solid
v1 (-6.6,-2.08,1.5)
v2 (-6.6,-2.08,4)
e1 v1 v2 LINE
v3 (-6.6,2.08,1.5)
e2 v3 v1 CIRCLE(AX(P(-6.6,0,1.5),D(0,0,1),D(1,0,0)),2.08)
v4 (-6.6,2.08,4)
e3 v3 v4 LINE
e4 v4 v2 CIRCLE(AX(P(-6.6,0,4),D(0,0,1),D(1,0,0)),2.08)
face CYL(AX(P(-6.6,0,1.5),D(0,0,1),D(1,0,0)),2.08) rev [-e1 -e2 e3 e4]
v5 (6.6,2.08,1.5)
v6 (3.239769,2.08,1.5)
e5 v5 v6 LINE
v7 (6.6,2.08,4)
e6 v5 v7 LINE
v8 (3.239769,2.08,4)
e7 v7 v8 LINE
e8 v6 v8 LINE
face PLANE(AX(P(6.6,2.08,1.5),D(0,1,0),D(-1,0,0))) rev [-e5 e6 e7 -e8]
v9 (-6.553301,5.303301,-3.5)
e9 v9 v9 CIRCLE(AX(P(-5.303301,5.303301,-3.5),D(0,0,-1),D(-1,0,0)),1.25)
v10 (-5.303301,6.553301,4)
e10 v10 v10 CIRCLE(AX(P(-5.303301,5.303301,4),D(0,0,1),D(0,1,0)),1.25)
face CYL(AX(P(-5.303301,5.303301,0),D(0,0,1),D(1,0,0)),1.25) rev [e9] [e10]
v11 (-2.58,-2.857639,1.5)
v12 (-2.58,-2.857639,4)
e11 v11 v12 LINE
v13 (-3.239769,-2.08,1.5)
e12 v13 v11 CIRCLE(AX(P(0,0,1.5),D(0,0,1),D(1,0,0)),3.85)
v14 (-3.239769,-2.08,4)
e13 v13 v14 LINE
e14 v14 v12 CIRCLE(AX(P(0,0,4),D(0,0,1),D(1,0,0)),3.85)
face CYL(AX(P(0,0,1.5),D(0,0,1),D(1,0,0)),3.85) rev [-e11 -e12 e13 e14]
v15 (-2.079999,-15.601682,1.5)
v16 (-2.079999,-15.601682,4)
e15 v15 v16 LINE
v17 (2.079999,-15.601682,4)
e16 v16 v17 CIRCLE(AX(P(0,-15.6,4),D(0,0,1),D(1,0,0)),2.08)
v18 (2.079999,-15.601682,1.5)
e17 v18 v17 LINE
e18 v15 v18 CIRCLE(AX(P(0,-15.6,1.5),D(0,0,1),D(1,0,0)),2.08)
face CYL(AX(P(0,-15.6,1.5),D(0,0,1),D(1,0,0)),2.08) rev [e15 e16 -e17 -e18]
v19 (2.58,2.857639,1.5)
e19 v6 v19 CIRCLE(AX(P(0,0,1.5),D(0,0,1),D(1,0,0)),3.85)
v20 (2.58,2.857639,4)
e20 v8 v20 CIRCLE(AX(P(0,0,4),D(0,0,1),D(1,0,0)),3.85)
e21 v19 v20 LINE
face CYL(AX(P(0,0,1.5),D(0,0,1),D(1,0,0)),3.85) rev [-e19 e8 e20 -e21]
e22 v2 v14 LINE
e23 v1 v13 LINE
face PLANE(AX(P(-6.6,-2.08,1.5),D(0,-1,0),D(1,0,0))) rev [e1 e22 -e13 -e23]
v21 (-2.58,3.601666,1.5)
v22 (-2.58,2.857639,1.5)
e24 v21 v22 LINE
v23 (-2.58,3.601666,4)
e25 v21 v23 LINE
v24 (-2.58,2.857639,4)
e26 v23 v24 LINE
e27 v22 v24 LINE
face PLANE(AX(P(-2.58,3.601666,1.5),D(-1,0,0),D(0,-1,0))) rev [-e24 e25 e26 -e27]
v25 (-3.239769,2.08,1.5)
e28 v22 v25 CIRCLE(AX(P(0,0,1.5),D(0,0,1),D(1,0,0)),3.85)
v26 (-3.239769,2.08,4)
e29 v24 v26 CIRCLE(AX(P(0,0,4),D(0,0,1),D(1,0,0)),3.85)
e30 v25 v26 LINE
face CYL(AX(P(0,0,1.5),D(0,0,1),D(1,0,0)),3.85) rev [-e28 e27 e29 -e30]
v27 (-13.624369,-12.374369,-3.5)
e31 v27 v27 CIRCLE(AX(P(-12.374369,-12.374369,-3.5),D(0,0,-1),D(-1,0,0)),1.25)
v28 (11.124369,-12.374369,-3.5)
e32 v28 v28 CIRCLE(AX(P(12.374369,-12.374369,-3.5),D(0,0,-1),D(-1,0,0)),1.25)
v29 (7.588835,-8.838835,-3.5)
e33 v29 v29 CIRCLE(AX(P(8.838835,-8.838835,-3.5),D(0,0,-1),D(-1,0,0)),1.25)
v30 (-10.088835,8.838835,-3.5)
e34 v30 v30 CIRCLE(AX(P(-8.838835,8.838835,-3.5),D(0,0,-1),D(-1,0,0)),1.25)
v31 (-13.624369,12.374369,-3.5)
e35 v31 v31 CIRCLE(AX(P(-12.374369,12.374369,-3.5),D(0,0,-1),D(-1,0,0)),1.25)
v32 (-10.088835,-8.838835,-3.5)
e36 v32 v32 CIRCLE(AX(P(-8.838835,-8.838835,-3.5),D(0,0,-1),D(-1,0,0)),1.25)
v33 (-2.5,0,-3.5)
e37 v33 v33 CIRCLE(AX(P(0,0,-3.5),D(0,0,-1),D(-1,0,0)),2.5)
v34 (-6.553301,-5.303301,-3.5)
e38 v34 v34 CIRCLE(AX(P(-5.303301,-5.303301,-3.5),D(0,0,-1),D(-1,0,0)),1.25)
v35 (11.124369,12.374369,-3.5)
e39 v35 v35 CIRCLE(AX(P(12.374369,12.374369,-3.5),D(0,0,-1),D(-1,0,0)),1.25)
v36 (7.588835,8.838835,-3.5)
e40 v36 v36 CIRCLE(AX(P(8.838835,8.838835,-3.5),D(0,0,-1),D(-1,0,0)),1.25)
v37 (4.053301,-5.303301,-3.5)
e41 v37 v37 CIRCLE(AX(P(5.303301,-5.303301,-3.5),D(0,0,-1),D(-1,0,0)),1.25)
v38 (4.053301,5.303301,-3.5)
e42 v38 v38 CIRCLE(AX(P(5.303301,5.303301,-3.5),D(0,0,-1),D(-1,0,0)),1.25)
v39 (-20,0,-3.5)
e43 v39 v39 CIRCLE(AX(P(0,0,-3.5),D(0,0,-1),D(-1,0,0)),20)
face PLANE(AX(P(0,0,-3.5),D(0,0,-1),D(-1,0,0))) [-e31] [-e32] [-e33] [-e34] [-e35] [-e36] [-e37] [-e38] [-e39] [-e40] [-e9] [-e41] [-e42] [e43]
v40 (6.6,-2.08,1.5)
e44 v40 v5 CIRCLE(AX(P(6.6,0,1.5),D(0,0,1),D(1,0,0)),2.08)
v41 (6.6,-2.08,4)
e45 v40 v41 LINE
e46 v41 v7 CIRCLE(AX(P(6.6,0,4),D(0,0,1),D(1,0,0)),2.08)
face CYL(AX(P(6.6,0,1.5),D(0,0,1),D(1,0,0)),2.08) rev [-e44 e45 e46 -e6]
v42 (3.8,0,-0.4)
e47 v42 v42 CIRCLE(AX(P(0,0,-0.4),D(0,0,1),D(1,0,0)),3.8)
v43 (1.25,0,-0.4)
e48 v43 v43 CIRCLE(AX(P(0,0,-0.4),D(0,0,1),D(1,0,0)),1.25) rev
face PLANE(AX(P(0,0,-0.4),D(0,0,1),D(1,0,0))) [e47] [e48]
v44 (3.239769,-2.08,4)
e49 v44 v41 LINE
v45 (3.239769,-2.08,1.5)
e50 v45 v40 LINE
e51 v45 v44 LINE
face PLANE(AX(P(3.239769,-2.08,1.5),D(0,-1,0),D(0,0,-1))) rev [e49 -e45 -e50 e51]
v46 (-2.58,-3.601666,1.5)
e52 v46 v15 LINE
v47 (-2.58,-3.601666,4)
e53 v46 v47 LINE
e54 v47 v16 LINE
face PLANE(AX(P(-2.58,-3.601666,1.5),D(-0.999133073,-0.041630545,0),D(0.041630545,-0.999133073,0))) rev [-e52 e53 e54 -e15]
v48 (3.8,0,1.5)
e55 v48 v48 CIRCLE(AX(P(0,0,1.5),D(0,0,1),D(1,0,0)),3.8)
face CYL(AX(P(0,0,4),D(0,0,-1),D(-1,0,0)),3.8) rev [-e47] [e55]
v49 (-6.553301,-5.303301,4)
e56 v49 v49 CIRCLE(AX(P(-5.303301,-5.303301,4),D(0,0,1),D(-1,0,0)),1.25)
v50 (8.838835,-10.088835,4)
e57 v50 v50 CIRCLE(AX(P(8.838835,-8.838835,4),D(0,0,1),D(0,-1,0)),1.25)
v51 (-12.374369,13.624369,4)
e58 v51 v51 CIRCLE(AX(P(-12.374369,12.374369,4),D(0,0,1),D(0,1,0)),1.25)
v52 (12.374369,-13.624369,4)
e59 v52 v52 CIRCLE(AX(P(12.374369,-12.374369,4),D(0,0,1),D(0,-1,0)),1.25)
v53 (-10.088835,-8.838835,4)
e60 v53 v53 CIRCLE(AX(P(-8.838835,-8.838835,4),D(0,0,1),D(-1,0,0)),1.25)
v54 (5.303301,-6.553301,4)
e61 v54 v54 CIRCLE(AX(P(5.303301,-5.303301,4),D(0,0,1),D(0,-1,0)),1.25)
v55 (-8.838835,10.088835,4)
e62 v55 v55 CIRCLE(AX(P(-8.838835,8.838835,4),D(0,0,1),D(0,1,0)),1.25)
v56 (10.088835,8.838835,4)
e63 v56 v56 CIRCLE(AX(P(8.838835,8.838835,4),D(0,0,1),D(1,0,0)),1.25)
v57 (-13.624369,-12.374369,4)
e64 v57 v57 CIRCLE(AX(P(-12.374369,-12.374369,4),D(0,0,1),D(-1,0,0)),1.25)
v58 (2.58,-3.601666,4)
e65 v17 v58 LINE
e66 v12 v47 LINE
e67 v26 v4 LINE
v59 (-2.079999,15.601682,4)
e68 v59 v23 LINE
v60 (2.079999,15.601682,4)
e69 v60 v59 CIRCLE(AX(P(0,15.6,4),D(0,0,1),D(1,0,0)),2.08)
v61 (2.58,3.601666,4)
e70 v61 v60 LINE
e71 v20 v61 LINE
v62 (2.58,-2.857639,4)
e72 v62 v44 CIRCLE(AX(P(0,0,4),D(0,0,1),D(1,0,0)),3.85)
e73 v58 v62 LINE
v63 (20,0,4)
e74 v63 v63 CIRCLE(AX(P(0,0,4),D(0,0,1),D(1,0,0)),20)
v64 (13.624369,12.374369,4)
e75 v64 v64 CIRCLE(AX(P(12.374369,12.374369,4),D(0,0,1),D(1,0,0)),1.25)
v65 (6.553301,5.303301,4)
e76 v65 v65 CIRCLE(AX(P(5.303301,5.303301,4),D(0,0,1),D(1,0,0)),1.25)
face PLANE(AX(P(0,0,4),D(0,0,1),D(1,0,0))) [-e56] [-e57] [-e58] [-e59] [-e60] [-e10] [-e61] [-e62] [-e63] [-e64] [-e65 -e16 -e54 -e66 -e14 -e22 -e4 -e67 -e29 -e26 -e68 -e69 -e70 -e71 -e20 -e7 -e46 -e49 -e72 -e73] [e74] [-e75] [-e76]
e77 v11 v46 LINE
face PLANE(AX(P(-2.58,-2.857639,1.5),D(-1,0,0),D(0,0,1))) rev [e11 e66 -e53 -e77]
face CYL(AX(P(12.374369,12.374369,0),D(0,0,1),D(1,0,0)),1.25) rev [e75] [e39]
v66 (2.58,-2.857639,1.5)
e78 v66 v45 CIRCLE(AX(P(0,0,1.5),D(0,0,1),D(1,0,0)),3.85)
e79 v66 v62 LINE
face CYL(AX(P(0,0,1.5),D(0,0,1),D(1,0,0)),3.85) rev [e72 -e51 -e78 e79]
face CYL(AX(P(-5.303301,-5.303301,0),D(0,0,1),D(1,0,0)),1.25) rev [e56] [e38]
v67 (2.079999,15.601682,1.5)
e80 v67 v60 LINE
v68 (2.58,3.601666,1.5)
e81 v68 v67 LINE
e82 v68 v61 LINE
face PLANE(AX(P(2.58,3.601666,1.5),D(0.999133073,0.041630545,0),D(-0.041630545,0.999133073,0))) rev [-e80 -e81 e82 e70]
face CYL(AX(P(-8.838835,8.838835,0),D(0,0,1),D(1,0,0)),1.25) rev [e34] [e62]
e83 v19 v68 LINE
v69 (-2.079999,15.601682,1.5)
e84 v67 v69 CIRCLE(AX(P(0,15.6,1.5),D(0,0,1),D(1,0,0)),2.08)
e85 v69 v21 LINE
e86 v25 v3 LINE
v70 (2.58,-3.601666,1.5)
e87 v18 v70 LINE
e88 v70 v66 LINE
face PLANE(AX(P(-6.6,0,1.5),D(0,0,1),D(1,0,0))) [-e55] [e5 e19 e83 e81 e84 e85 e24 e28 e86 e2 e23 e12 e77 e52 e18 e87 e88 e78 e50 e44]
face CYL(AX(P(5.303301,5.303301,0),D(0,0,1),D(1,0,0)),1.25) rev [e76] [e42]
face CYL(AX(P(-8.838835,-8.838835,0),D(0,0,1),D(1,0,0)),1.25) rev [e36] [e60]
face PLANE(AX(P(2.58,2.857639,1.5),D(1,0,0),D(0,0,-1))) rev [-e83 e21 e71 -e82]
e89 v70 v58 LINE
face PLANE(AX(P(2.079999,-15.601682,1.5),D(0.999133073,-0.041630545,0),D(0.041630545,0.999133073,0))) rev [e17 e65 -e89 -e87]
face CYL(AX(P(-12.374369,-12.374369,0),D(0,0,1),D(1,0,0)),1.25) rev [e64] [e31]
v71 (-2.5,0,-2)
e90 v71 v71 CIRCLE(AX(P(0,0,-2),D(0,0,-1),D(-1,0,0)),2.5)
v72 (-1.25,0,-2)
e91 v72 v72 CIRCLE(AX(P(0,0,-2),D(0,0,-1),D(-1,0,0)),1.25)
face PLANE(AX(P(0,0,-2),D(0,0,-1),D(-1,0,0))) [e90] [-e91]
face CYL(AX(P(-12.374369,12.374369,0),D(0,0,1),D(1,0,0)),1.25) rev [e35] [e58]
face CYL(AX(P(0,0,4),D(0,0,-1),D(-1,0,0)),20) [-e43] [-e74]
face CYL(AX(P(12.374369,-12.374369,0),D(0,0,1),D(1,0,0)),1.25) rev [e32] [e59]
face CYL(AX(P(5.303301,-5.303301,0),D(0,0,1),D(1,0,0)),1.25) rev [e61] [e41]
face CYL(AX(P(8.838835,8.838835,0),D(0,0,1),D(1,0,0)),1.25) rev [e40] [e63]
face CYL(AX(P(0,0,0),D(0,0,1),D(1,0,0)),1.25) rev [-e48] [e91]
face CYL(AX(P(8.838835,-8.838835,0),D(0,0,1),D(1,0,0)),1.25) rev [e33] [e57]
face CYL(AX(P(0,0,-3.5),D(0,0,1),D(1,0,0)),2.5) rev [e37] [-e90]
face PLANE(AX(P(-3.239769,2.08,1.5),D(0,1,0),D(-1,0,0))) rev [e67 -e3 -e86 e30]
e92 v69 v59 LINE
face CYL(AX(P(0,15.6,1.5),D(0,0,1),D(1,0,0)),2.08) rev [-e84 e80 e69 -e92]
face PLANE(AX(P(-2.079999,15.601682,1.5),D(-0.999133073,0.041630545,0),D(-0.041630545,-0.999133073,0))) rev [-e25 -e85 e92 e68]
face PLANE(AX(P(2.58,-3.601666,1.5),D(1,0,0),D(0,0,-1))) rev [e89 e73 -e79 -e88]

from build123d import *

# Parameters (mm, degrees)
SKETCH1_R               = 20
BOSS_EXTRUDE1_DEPTH     = 4
SKETCH2_R               = 1.25
CUT_EXTRUDE1_DEPTH      = 29.565713714
CAVITY1_START           = 2.8
CAVITY1_OUTLINE_R       = 0.675
CAVITY1_OUTLINE_R_2     = 0.6
CAVITY1_OUTLINE_R_3     = 2.5
CAVITY1_DEPTH           = 1.2
CAVITY1_START_2         = 3.4
CAVITY1_2_OUTLINE_R     = 2.5
CAVITY1_2_OUTLINE_R_2   = 1.25
CAVITY1_2_DEPTH         = 0.6
CUT_EXTRUDE2_START      = -2
CUT_EXTRUDE2_DEPTH      = 2
CUT_EXTRUDE3_START      = -1.2
CUT_EXTRUDE3_DEPTH      = 1.2
CUT_EXTRUDE4_DEPTH      = 1.2
SKETCH6_R               = 1.25
CUT_EXTRUDE5_DEPTH      = 29.565713714
CIRPATTERN1_COUNT       = 4
CUT_EXTRUDE6_DEPTH      = 29.422526278
CUT_EXTRUDE6_DEPTH_BACK = 2.4
SKETCH7_R               = 3.8
SKETCH8_R               = 20
SKETCH8_R_2             = 2.5
SKETCH8_R_3             = 1.25
BOSS_EXTRUDE2_DEPTH     = 3.5
CUT_EXTRUDE7_DEPTH      = 2.5
SKETCH10_R              = 2.5
SKETCH10_R_2            = 1.25
BOSS_EXTRUDE4_DEPTH     = 0.8
SKETCH11_R              = 2.5
SKETCH11_R_2            = 1.25
BOSS_EXTRUDE5_DEPTH     = 1.2
SKETCH12_R              = 3.8
CUT_EXTRUDE8_DEPTH      = 0.8


# Read off the part's stored shape, not the designer's step: Cavity1
with BuildPart() as part:
    # Sketch1 → Boss-Extrude1 (new body)
    with BuildSketch(Plane.XY):
        Circle(SKETCH1_R)
    extrude(amount=BOSS_EXTRUDE1_DEPTH)

    # Sketch2 → Cut-Extrude1 (cut, through all)
    with BuildSketch(Plane.XY.offset(4)):
        Circle(SKETCH2_R)
    extrude(amount=-CUT_EXTRUDE1_DEPTH, mode=Mode.SUBTRACT)

    # Cavity1 outline → Cavity1 (cut)
    with BuildSketch(Plane.XY.offset(CAVITY1_START)):
        with BuildLine():
            ThreePointArc((2.993325909, 2), (2.762479071, 2.308399745), (2.5, 2.590366769))
            Line((2.5, 2.590366769), (2.5, 3.6))
            Line((2.5, 3.6), (2, 15.6))
            ThreePointArc((2, 15.6), (0, 17.6), (-2, 15.6))
            Line((-2, 15.6), (-2.5, 3.6))
            Line((-2.5, 3.6), (-2.5, 2.590366769))
            ThreePointArc((-2.5, 2.590366769), (-2.762479071, 2.308399745), (-2.993325909, 2))
            Line((-2.993325909, 2), (-6.6, 2))
            ThreePointArc((-6.6, 2), (-8.6, 0), (-6.6, -2))
            Line((-6.6, -2), (-2.993325909, -2))
            ThreePointArc((-2.993325909, -2), (-2.762479071, -2.308399745), (-2.5, -2.590366769))
            Line((-2.5, -2.590366769), (-2.5, -3.6))
            Line((-2.5, -3.6), (-2, -15.6))
            ThreePointArc((-2, -15.6), (0, -17.6), (2, -15.6))
            Line((2, -15.6), (2.5, -3.6))
            Line((2.5, -3.6), (2.5, -2.590366769))
            ThreePointArc((2.5, -2.590366769), (2.762479071, -2.308399745), (2.993325909, -2))
            Line((2.993325909, -2), (6.6, -2))
            ThreePointArc((6.6, -2), (8.6, 0), (6.6, 2))
            Line((6.6, 2), (2.993325909, 2))
        make_face()
        with Locations((0, -15.6)):
            Circle(CAVITY1_OUTLINE_R, mode=Mode.SUBTRACT)
        with Locations((0, -13.4)):
            Circle(CAVITY1_OUTLINE_R, mode=Mode.SUBTRACT)
        with Locations((0, -11.2)):
            Circle(CAVITY1_OUTLINE_R, mode=Mode.SUBTRACT)
        with Locations((0, -9)):
            Circle(CAVITY1_OUTLINE_R, mode=Mode.SUBTRACT)
        with Locations((0, -6.8)):
            Circle(CAVITY1_OUTLINE_R, mode=Mode.SUBTRACT)
        with Locations((0, -4.6)):
            Circle(CAVITY1_OUTLINE_R, mode=Mode.SUBTRACT)
        with Locations((-6.6, 0)):
            Circle(CAVITY1_OUTLINE_R_2, mode=Mode.SUBTRACT)
        with Locations((-4.6, 0)):
            Circle(CAVITY1_OUTLINE_R_2, mode=Mode.SUBTRACT)
        Circle(CAVITY1_OUTLINE_R_3, mode=Mode.SUBTRACT)
        with Locations((0, 4.6)):
            Circle(CAVITY1_OUTLINE_R, mode=Mode.SUBTRACT)
        with Locations((0, 6.8)):
            Circle(CAVITY1_OUTLINE_R, mode=Mode.SUBTRACT)
        with Locations((4.6, 0)):
            Circle(CAVITY1_OUTLINE_R_2, mode=Mode.SUBTRACT)
        with Locations((6.6, 0)):
            Circle(CAVITY1_OUTLINE_R_2, mode=Mode.SUBTRACT)
        with Locations((0, 9)):
            Circle(CAVITY1_OUTLINE_R, mode=Mode.SUBTRACT)
        with Locations((0, 11.2)):
            Circle(CAVITY1_OUTLINE_R, mode=Mode.SUBTRACT)
        with Locations((0, 13.4)):
            Circle(CAVITY1_OUTLINE_R, mode=Mode.SUBTRACT)
        with Locations((0, 15.6)):
            Circle(CAVITY1_OUTLINE_R, mode=Mode.SUBTRACT)
    extrude(amount=CAVITY1_DEPTH, mode=Mode.SUBTRACT)

    # Cavity1 2 outline → Cavity1 2 (cut)
    with BuildSketch(Plane.XY.offset(CAVITY1_START_2)):
        Circle(CAVITY1_2_OUTLINE_R)
        Circle(CAVITY1_2_OUTLINE_R_2, mode=Mode.SUBTRACT)
    extrude(amount=CAVITY1_2_DEPTH, mode=Mode.SUBTRACT)

    # Sketch3 → Cut-Extrude2 (cut)
    with BuildSketch(Plane.XY.offset(3.4).offset(CUT_EXTRUDE2_START)):
        with BuildLine():
            ThreePointArc((-2.5, 0), (0, -2.5), (2.5, 0))
            ThreePointArc((2.5, 0), (0, 2.5), (-2.5, 0))
        make_face()
    extrude(amount=CUT_EXTRUDE2_DEPTH, mode=Mode.SUBTRACT)

    # Sketch4 → Cut-Extrude3 (cut)
    with BuildSketch(Plane.XY.offset(4).offset(CUT_EXTRUDE3_START)):
        with BuildLine():
            Line((-6.6, -2), (-2.993325909, -2))
            ThreePointArc((-2.993325909, -2), (-2.762479071, -2.308399745), (-2.5, -2.590366769))
            Line((-2.5, -2.590366769), (-2.5, -3.6))
            Line((-2.5, -3.6), (-2, -15.6))
            ThreePointArc((-2, -15.6), (0, -17.6), (2, -15.6))
            Line((2, -15.6), (2.5, -3.6))
            Line((2.5, -3.6), (2.5, -2.590366769))
            ThreePointArc((2.5, -2.590366769), (2.762479071, -2.308399745), (2.993325909, -2))
            Line((2.993325909, -2), (6.6, -2))
            ThreePointArc((6.6, -2), (8.6, 0), (6.6, 2))
            Line((6.6, 2), (2.993325909, 2))
            ThreePointArc((2.993325909, 2), (2.762479071, 2.308399745), (2.5, 2.590366769))
            Line((2.5, 2.590366769), (2.5, 3.6))
            Line((2.5, 3.6), (2, 15.6))
            ThreePointArc((2, 15.6), (0, 17.6), (-2, 15.6))
            Line((-2, 15.6), (-2.5, 3.6))
            Line((-2.5, 3.6), (-2.5, 2.590366769))
            ThreePointArc((-2.5, 2.590366769), (-2.762479071, 2.308399745), (-2.993325909, 2))
            Line((-2.993325909, 2), (-6.6, 2))
            ThreePointArc((-6.6, 2), (-8.6, 0), (-6.6, -2))
        make_face()
    extrude(amount=CUT_EXTRUDE3_DEPTH, mode=Mode.SUBTRACT)

    # Sketch5 → Cut-Extrude4 (cut)
    with BuildSketch(Plane.XY.offset(4)):
        with BuildLine():
            Line((-6.6, -2.03), (-3.00931886, -2.03))
            ThreePointArc((-3.00931886, -2.03), (-2.784441978, -2.328901645), (-2.53, -2.603075105))
            Line((-2.53, -2.603075105), (-2.53, -3.600624729))
            Line((-2.53, -3.600624729), (-2.029999903, -15.600627053))
            ThreePointArc((-2.029999903, -15.600627053), (0, -17.63), (2.029999903, -15.600627053))
            Line((2.029999903, -15.600627053), (2.53, -3.600624729))
            Line((2.53, -3.600624729), (2.53, -2.603075105))
            ThreePointArc((2.53, -2.603075105), (2.784441978, -2.328901645), (3.00931886, -2.03))
            Line((3.00931886, -2.03), (6.6, -2.03))
            ThreePointArc((6.6, -2.03), (8.63, 0), (6.6, 2.03))
            Line((6.6, 2.03), (3.00931886, 2.03))
            ThreePointArc((3.00931886, 2.03), (2.784441978, 2.328901645), (2.53, 2.603075105))
            Line((2.53, 2.603075105), (2.53, 3.600624729))
            Line((2.53, 3.600624729), (2.029999903, 15.600627053))
            ThreePointArc((2.029999903, 15.600627053), (0, 17.63), (-2.029999903, 15.600627053))
            Line((-2.029999903, 15.600627053), (-2.53, 3.600624729))
            Line((-2.53, 3.600624729), (-2.53, 2.603075105))
            ThreePointArc((-2.53, 2.603075105), (-2.784441978, 2.328901645), (-3.00931886, 2.03))
            Line((-3.00931886, 2.03), (-6.6, 2.03))
            ThreePointArc((-6.6, 2.03), (-8.63, 0), (-6.6, -2.03))
        make_face()
    extrude(amount=-CUT_EXTRUDE4_DEPTH, mode=Mode.SUBTRACT)

    # Sketch6 → Cut-Extrude5 (cut, through all)
    with BuildSketch(Plane.XY.offset(4)):
        with Locations((5.303300859, 5.303300859)):
            Circle(SKETCH6_R)
        with Locations((8.838834765, 8.838834765)):
            Circle(SKETCH6_R)
        with Locations((12.374368671, 12.374368671)):
            Circle(SKETCH6_R)
    cut_extrude5 = extrude(amount=-CUT_EXTRUDE5_DEPTH, mode=Mode.SUBTRACT)

    # CirPattern1: Cut-Extrude5 ×4 about axis
    cirpattern1_axis = Axis((0, 0, 0), (0, 0, 1))
    for i in range(1, CIRPATTERN1_COUNT):
        add(cut_extrude5.rotate(cirpattern1_axis, i * 360 / CIRPATTERN1_COUNT), mode=Mode.SUBTRACT)

    # Sketch7 → Cut-Extrude6 (cut, two sides: drawn at the far end of the back side and taken through both)
    with BuildSketch(Plane.XY.offset(2.8).offset(-CUT_EXTRUDE6_DEPTH_BACK)):
        with Locations(Location((0, 0, 0), (0, 0, 147.709612918))):
            Circle(SKETCH7_R)
    extrude(amount=CUT_EXTRUDE6_DEPTH + CUT_EXTRUDE6_DEPTH_BACK, mode=Mode.SUBTRACT)

    # Sketch8 → Boss-Extrude2 (add)
    with BuildSketch(Plane(origin=(0, 0, 0), x_dir=(-1, 0, 0), z_dir=(0, 0, -1))):
        Circle(SKETCH8_R)
        Circle(SKETCH8_R_2, mode=Mode.SUBTRACT)
        with Locations(Location((12.374368671, 12.374368671, 0), (0, 0, 90))):
            Circle(SKETCH8_R_3, mode=Mode.SUBTRACT)
        with Locations(Location((-12.374368671, 12.374368671, 0), (0, 0, 180))):
            Circle(SKETCH8_R_3, mode=Mode.SUBTRACT)
        with Locations(Location((-8.838834765, 8.838834765, 0), (0, 0, 180))):
            Circle(SKETCH8_R_3, mode=Mode.SUBTRACT)
        with Locations(Location((-5.303300859, 5.303300859, 0), (0, 0, 180))):
            Circle(SKETCH8_R_3, mode=Mode.SUBTRACT)
        with Locations((12.374368671, -12.374368671)):
            Circle(SKETCH8_R_3, mode=Mode.SUBTRACT)
        with Locations((8.838834765, -8.838834765)):
            Circle(SKETCH8_R_3, mode=Mode.SUBTRACT)
        with Locations((5.303300859, -5.303300859)):
            Circle(SKETCH8_R_3, mode=Mode.SUBTRACT)
        with Locations(Location((-12.374368671, -12.374368671, 0), (0, 0, 270))):
            Circle(SKETCH8_R_3, mode=Mode.SUBTRACT)
        with Locations(Location((-8.838834765, -8.838834765, 0), (0, 0, 270))):
            Circle(SKETCH8_R_3, mode=Mode.SUBTRACT)
        with Locations(Location((-5.303300859, -5.303300859, 0), (0, 0, 270))):
            Circle(SKETCH8_R_3, mode=Mode.SUBTRACT)
        with Locations(Location((5.303300859, 5.303300859, 0), (0, 0, 90))):
            Circle(SKETCH8_R_3, mode=Mode.SUBTRACT)
        with Locations(Location((8.838834765, 8.838834765, 0), (0, 0, 90))):
            Circle(SKETCH8_R_3, mode=Mode.SUBTRACT)
    extrude(amount=BOSS_EXTRUDE2_DEPTH)

    # Sketch9 → Cut-Extrude7 (cut)
    with BuildSketch(Plane.XY.offset(4)):
        with BuildLine():
            Line((2.58, 3.601665944), (2.07999932, 15.601682271))
            ThreePointArc((2.07999932, 15.601682271), (0, 17.68), (-2.07999932, 15.601682271))
            Line((-2.07999932, 15.601682271), (-2.58, 3.601665944))
            Line((-2.58, 3.601665944), (-2.58, 2.857638886))
            ThreePointArc((-2.58, 2.857638886), (-2.935746402, 2.490761543), (-3.23976851, 2.08))
            Line((-3.23976851, 2.08), (-6.6, 2.08))
            ThreePointArc((-6.6, 2.08), (-8.68, 0), (-6.6, -2.08))
            Line((-6.6, -2.08), (-3.23976851, -2.08))
            ThreePointArc((-3.23976851, -2.08), (-2.935746402, -2.490761543), (-2.58, -2.857638886))
            Line((-2.58, -2.857638886), (-2.58, -3.601665944))
            Line((-2.58, -3.601665944), (-2.07999932, -15.601682271))
            ThreePointArc((-2.07999932, -15.601682271), (0, -17.68), (2.07999932, -15.601682271))
            Line((2.07999932, -15.601682271), (2.58, -3.601665944))
            Line((2.58, -3.601665944), (2.58, -2.857638886))
            ThreePointArc((2.58, -2.857638886), (2.935746402, -2.490761543), (3.23976851, -2.08))
            Line((3.23976851, -2.08), (6.6, -2.08))
            ThreePointArc((6.6, -2.08), (8.68, 0), (6.6, 2.08))
            Line((6.6, 2.08), (3.23976851, 2.08))
            ThreePointArc((3.23976851, 2.08), (2.935746402, 2.490761543), (2.58, 2.857638886))
            Line((2.58, 2.857638886), (2.58, 3.601665944))
        make_face()
    extrude(amount=-CUT_EXTRUDE7_DEPTH, mode=Mode.SUBTRACT)

    # Sketch10 → Boss-Extrude4 (add)
    with BuildSketch(Plane(origin=(0, 0, 0), x_dir=(-1, 0, 0), z_dir=(0, 0, -1))):
        Circle(SKETCH10_R)
        with Locations(Location((0, 0, 0), (0, 0, 180))):
            Circle(SKETCH10_R_2, mode=Mode.SUBTRACT)
    extrude(amount=BOSS_EXTRUDE4_DEPTH)

    # Sketch11 → Boss-Extrude5 (add)
    with BuildSketch(Plane(origin=(0, 0, -0.8), x_dir=(-1, 0, 0), z_dir=(0, 0, -1))):
        Circle(SKETCH11_R)
        with Locations(Location((0, 0, 0), (0, 0, 180))):
            Circle(SKETCH11_R_2, mode=Mode.SUBTRACT)
    extrude(amount=BOSS_EXTRUDE5_DEPTH)

    # Sketch12 → Cut-Extrude8 (cut)
    with BuildSketch(Plane.XY.offset(0.4)):
        Circle(SKETCH12_R)
    extrude(amount=-CUT_EXTRUDE8_DEPTH, mode=Mode.SUBTRACT)


solid = part.part
